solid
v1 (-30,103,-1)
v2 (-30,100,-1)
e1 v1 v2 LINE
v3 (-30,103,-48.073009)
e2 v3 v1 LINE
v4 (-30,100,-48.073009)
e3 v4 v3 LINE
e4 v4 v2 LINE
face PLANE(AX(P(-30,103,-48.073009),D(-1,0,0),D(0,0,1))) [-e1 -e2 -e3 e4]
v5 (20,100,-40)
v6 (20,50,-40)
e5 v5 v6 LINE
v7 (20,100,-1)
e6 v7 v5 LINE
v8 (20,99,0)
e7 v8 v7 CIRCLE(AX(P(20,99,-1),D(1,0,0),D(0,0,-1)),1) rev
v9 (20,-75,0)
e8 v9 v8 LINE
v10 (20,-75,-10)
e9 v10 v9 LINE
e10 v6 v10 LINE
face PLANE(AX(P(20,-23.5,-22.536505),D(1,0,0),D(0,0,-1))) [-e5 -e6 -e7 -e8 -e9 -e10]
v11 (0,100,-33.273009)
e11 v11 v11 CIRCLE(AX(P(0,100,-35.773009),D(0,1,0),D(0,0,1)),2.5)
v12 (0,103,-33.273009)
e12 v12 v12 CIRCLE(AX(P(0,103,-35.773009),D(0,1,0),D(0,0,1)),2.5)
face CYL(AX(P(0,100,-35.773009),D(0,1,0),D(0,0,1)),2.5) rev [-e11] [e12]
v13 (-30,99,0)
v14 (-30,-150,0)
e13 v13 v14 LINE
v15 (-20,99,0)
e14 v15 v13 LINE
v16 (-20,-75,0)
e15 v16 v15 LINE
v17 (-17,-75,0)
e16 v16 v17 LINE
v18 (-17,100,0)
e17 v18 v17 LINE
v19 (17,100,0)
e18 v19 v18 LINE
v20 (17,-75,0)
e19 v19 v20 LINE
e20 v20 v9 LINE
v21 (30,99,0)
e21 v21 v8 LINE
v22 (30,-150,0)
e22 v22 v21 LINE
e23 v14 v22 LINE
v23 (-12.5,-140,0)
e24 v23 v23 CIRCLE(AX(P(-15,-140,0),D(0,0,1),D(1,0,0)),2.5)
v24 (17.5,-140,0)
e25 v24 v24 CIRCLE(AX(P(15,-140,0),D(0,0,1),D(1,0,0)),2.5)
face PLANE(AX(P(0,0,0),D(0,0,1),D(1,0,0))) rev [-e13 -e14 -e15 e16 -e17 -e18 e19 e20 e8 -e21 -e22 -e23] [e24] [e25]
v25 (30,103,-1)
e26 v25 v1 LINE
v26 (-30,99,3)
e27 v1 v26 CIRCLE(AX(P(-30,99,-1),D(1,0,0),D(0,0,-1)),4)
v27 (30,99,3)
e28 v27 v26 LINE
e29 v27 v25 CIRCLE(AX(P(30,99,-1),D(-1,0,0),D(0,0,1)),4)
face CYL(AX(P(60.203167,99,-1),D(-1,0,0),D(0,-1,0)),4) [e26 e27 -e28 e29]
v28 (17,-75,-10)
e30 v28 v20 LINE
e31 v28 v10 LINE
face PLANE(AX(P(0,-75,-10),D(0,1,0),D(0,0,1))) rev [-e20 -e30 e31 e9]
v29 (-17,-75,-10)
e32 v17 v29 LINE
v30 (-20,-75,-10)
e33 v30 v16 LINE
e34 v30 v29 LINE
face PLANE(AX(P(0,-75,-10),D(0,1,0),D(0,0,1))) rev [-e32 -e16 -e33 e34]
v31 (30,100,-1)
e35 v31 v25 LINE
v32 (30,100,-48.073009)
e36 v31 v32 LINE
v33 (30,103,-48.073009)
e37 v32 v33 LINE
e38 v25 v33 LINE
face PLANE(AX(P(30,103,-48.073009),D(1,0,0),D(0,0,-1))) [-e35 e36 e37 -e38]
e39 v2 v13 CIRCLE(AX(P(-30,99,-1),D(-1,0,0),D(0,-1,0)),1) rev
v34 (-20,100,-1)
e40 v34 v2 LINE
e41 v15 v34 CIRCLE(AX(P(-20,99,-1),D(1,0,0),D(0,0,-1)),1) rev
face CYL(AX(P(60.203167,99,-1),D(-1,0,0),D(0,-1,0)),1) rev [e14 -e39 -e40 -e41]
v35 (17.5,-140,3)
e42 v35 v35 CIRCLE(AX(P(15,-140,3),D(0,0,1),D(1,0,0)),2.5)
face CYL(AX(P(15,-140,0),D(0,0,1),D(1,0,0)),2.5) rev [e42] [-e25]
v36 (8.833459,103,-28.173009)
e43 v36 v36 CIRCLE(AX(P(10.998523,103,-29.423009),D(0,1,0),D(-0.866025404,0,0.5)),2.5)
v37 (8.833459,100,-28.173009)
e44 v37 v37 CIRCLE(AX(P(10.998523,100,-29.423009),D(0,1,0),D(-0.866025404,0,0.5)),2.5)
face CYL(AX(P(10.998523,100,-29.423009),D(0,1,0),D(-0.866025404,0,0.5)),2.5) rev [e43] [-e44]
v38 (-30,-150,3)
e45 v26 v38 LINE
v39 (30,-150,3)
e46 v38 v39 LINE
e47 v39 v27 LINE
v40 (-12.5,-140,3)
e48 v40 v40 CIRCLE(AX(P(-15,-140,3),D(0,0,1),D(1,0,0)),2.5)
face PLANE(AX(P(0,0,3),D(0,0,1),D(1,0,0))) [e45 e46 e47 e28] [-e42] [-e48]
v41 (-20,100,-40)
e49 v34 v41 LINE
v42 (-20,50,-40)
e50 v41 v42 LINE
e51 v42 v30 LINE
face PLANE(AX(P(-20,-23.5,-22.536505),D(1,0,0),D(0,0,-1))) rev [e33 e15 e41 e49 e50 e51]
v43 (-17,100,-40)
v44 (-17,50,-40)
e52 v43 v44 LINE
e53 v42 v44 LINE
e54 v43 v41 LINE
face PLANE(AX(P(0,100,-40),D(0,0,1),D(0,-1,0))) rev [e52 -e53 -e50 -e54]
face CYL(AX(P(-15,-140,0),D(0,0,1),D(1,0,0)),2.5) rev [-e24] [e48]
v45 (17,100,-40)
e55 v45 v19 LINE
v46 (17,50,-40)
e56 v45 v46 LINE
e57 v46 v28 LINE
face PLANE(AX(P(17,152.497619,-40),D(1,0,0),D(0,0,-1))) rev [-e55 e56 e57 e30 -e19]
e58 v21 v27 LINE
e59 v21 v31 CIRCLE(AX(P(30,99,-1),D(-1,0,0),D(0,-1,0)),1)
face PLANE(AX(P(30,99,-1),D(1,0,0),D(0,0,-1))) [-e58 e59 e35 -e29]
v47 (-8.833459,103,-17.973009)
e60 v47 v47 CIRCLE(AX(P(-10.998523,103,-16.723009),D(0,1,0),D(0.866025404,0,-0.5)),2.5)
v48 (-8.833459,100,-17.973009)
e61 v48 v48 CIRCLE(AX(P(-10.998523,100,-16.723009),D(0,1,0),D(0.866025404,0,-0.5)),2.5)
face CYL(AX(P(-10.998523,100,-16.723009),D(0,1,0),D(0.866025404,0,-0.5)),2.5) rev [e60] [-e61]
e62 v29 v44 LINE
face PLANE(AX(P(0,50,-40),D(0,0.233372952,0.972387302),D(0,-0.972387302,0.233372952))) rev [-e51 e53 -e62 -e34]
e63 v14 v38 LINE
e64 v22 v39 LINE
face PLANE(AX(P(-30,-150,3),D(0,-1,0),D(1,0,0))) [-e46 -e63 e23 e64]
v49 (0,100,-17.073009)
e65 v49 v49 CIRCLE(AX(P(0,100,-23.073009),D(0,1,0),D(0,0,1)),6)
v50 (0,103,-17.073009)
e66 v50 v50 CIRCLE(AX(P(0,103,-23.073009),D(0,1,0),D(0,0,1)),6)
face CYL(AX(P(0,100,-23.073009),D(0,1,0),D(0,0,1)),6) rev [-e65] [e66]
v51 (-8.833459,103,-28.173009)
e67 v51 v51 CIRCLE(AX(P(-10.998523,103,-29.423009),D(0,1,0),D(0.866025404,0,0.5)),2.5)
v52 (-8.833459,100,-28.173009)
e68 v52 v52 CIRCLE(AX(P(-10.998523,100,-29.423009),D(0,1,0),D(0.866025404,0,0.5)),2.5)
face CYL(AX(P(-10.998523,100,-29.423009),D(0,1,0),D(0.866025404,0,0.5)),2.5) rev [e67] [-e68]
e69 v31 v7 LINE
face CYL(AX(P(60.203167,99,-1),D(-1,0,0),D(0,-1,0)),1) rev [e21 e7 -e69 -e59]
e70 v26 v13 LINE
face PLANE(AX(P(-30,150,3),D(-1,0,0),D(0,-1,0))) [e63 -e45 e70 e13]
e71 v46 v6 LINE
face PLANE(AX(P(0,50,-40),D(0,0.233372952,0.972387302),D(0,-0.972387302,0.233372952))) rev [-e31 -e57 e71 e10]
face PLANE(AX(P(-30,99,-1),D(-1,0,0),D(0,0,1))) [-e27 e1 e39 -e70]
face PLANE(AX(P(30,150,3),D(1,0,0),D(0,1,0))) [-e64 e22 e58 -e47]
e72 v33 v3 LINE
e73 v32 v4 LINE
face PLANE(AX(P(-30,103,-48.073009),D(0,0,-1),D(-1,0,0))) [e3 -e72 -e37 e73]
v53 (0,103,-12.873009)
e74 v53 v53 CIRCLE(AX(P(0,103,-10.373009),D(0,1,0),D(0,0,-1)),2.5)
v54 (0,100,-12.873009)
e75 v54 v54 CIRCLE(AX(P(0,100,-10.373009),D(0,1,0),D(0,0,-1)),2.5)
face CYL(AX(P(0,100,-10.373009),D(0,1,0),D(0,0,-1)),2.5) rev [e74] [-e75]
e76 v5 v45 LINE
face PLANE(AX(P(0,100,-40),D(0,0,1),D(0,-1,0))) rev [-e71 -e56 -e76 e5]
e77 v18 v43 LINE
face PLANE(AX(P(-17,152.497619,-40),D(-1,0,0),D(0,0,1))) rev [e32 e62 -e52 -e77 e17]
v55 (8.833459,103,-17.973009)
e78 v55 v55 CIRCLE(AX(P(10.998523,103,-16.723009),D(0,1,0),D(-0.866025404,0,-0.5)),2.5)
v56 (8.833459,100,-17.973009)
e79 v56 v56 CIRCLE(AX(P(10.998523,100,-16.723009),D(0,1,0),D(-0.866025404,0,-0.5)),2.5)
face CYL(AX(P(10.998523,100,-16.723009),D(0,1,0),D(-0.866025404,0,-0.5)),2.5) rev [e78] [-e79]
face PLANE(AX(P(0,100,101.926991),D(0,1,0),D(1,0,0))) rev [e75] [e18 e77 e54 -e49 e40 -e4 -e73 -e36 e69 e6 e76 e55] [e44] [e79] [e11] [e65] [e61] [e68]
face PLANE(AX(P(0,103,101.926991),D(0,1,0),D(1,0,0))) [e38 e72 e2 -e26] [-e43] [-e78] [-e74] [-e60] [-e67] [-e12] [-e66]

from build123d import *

# Parameters (mm, degrees)
ESBO_O1_W                = 60
ESBO_O1_H                = 300
RESSALTO_EXTRUS_O1_DEPTH = 3
DOBRA_START              = -30
DOBRA_ESBO_ADA1_DEPTH    = 60
DOBRA_ESBO_ADA1_2_DEPTH  = 60
NERVURA1_START           = -20
NERVURA1_DEPTH           = 40
CORTE_EXTRUS_O1_START    = -175
ESBO_O6_W                = 34
ESBO_O6_H                = 40
CORTE_EXTRUS_O1_DEPTH    = 175
ESBO_O7_R                = 2.5
CORTE_EXTRUS_O2_DEPTH    = 3
ESBO_O8_R                = 6
CORTE_EXTRUS_O3_DEPTH    = 3
ESBO_O9_R                = 2.5
CORTE_EXTRUS_O4_DEPTH    = 3
PADR_OCIRCULAR1_COUNT    = 6


# Read off the part's stored shape, not the designer's step: Dobra esboçada1, Nervura1
with BuildPart() as part:
    # Esboço1 → Ressalto-extrusão1 (new body)
    with BuildSketch(Plane.XY):
        Rectangle(ESBO_O1_W, ESBO_O1_H)
    extrude(amount=RESSALTO_EXTRUS_O1_DEPTH)

    # Dobra esboçada1 outline → Dobra esboçada1 (cut)
    with BuildSketch(Plane.YZ.offset(DOBRA_START)):
        with BuildLine():
            ThreePointArc((99, 3), (101.449489743, 2.16227766), (102.872983346, 0))
            Line((102.872983346, 0), (150, 0))
            Line((150, 0), (150, 3))
            Line((150, 3), (99, 3))
        make_face()
    extrude(amount=DOBRA_ESBO_ADA1_DEPTH, mode=Mode.SUBTRACT)

    # Dobra esbo_ada1 2 outline → Dobra esbo_ada1 2 (add)
    with BuildSketch(Plane.YZ.offset(DOBRA_START)):
        with BuildLine():
            Line((100, -1), (100, -48.073009183))
            Line((100, -48.073009183), (103, -48.073009183))
            Line((103, -48.073009183), (103, -1))
            ThreePointArc((103, -1), (102.968118785, -0.49598283), (102.872983346, 0))
            Line((102.872983346, 0), (99, 0))
            ThreePointArc((99, 0), (99.707106781, -0.292893219), (100, -1))
        make_face()
    extrude(amount=DOBRA_ESBO_ADA1_2_DEPTH)

    # Nervura1 outline → Nervura1 (add)
    with BuildSketch(Plane(origin=(0, 0, 0), x_dir=(0, 0, -1), z_dir=(1, 0, 0)).offset(NERVURA1_START)):
        with BuildLine():
            Line((40, 50), (40, 100))
            Line((40, 100), (1, 100))
            ThreePointArc((1, 100), (0.292893219, 99.707106781), (0, 99))
            Line((0, 99), (0, -75))
            Line((0, -75), (10, -75))
            Line((10, -75), (40, 50))
        make_face()
    extrude(amount=NERVURA1_DEPTH)

    # Esboço6 → Corte-extrusão1 (cut)
    with BuildSketch(Plane.XZ.offset(75).offset(CORTE_EXTRUS_O1_START)):
        with Locations((0, -20)):
            Rectangle(ESBO_O6_W, ESBO_O6_H)
    extrude(amount=CORTE_EXTRUS_O1_DEPTH, mode=Mode.SUBTRACT)

    # Esboço7 → Corte-extrusão2 (cut)
    with BuildSketch(Plane.XY.offset(3)):
        with Locations((-15, -140)):
            Circle(ESBO_O7_R)
        with Locations((15, -140)):
            Circle(ESBO_O7_R)
    extrude(amount=-CORTE_EXTRUS_O2_DEPTH, mode=Mode.SUBTRACT)

    # Esboço8 → Corte-extrusão3 (cut)
    with BuildSketch(Plane(origin=(0, 103, 0), x_dir=(1, 0, 0), z_dir=(0, 1, 0))):
        with Locations(Location((0, 23.073009183, 0), (0, 0, 270))):
            Circle(ESBO_O8_R)
    extrude(amount=-CORTE_EXTRUS_O3_DEPTH, mode=Mode.SUBTRACT)

    # Esboço9 → Corte-extrusão4 (cut)
    with BuildSketch(Plane(origin=(0, 103, 0), x_dir=(1, 0, 0), z_dir=(0, 1, 0))):
        with Locations(Location((0, 35.773009183, 0), (0, 0, 270))):
            Circle(ESBO_O9_R)
    corte_extrus_o4 = extrude(amount=-CORTE_EXTRUS_O4_DEPTH, mode=Mode.SUBTRACT)

    # PadrãoCircular1: Corte-extrusão4 ×6 about axis
    padr_ocircular1_axis = Axis((0, 0, -23.073009183), (0, 1, 0))
    for i in range(1, PADR_OCIRCULAR1_COUNT):
        add(corte_extrus_o4.rotate(padr_ocircular1_axis, i * 360 / PADR_OCIRCULAR1_COUNT), mode=Mode.SUBTRACT)


solid = part.part
